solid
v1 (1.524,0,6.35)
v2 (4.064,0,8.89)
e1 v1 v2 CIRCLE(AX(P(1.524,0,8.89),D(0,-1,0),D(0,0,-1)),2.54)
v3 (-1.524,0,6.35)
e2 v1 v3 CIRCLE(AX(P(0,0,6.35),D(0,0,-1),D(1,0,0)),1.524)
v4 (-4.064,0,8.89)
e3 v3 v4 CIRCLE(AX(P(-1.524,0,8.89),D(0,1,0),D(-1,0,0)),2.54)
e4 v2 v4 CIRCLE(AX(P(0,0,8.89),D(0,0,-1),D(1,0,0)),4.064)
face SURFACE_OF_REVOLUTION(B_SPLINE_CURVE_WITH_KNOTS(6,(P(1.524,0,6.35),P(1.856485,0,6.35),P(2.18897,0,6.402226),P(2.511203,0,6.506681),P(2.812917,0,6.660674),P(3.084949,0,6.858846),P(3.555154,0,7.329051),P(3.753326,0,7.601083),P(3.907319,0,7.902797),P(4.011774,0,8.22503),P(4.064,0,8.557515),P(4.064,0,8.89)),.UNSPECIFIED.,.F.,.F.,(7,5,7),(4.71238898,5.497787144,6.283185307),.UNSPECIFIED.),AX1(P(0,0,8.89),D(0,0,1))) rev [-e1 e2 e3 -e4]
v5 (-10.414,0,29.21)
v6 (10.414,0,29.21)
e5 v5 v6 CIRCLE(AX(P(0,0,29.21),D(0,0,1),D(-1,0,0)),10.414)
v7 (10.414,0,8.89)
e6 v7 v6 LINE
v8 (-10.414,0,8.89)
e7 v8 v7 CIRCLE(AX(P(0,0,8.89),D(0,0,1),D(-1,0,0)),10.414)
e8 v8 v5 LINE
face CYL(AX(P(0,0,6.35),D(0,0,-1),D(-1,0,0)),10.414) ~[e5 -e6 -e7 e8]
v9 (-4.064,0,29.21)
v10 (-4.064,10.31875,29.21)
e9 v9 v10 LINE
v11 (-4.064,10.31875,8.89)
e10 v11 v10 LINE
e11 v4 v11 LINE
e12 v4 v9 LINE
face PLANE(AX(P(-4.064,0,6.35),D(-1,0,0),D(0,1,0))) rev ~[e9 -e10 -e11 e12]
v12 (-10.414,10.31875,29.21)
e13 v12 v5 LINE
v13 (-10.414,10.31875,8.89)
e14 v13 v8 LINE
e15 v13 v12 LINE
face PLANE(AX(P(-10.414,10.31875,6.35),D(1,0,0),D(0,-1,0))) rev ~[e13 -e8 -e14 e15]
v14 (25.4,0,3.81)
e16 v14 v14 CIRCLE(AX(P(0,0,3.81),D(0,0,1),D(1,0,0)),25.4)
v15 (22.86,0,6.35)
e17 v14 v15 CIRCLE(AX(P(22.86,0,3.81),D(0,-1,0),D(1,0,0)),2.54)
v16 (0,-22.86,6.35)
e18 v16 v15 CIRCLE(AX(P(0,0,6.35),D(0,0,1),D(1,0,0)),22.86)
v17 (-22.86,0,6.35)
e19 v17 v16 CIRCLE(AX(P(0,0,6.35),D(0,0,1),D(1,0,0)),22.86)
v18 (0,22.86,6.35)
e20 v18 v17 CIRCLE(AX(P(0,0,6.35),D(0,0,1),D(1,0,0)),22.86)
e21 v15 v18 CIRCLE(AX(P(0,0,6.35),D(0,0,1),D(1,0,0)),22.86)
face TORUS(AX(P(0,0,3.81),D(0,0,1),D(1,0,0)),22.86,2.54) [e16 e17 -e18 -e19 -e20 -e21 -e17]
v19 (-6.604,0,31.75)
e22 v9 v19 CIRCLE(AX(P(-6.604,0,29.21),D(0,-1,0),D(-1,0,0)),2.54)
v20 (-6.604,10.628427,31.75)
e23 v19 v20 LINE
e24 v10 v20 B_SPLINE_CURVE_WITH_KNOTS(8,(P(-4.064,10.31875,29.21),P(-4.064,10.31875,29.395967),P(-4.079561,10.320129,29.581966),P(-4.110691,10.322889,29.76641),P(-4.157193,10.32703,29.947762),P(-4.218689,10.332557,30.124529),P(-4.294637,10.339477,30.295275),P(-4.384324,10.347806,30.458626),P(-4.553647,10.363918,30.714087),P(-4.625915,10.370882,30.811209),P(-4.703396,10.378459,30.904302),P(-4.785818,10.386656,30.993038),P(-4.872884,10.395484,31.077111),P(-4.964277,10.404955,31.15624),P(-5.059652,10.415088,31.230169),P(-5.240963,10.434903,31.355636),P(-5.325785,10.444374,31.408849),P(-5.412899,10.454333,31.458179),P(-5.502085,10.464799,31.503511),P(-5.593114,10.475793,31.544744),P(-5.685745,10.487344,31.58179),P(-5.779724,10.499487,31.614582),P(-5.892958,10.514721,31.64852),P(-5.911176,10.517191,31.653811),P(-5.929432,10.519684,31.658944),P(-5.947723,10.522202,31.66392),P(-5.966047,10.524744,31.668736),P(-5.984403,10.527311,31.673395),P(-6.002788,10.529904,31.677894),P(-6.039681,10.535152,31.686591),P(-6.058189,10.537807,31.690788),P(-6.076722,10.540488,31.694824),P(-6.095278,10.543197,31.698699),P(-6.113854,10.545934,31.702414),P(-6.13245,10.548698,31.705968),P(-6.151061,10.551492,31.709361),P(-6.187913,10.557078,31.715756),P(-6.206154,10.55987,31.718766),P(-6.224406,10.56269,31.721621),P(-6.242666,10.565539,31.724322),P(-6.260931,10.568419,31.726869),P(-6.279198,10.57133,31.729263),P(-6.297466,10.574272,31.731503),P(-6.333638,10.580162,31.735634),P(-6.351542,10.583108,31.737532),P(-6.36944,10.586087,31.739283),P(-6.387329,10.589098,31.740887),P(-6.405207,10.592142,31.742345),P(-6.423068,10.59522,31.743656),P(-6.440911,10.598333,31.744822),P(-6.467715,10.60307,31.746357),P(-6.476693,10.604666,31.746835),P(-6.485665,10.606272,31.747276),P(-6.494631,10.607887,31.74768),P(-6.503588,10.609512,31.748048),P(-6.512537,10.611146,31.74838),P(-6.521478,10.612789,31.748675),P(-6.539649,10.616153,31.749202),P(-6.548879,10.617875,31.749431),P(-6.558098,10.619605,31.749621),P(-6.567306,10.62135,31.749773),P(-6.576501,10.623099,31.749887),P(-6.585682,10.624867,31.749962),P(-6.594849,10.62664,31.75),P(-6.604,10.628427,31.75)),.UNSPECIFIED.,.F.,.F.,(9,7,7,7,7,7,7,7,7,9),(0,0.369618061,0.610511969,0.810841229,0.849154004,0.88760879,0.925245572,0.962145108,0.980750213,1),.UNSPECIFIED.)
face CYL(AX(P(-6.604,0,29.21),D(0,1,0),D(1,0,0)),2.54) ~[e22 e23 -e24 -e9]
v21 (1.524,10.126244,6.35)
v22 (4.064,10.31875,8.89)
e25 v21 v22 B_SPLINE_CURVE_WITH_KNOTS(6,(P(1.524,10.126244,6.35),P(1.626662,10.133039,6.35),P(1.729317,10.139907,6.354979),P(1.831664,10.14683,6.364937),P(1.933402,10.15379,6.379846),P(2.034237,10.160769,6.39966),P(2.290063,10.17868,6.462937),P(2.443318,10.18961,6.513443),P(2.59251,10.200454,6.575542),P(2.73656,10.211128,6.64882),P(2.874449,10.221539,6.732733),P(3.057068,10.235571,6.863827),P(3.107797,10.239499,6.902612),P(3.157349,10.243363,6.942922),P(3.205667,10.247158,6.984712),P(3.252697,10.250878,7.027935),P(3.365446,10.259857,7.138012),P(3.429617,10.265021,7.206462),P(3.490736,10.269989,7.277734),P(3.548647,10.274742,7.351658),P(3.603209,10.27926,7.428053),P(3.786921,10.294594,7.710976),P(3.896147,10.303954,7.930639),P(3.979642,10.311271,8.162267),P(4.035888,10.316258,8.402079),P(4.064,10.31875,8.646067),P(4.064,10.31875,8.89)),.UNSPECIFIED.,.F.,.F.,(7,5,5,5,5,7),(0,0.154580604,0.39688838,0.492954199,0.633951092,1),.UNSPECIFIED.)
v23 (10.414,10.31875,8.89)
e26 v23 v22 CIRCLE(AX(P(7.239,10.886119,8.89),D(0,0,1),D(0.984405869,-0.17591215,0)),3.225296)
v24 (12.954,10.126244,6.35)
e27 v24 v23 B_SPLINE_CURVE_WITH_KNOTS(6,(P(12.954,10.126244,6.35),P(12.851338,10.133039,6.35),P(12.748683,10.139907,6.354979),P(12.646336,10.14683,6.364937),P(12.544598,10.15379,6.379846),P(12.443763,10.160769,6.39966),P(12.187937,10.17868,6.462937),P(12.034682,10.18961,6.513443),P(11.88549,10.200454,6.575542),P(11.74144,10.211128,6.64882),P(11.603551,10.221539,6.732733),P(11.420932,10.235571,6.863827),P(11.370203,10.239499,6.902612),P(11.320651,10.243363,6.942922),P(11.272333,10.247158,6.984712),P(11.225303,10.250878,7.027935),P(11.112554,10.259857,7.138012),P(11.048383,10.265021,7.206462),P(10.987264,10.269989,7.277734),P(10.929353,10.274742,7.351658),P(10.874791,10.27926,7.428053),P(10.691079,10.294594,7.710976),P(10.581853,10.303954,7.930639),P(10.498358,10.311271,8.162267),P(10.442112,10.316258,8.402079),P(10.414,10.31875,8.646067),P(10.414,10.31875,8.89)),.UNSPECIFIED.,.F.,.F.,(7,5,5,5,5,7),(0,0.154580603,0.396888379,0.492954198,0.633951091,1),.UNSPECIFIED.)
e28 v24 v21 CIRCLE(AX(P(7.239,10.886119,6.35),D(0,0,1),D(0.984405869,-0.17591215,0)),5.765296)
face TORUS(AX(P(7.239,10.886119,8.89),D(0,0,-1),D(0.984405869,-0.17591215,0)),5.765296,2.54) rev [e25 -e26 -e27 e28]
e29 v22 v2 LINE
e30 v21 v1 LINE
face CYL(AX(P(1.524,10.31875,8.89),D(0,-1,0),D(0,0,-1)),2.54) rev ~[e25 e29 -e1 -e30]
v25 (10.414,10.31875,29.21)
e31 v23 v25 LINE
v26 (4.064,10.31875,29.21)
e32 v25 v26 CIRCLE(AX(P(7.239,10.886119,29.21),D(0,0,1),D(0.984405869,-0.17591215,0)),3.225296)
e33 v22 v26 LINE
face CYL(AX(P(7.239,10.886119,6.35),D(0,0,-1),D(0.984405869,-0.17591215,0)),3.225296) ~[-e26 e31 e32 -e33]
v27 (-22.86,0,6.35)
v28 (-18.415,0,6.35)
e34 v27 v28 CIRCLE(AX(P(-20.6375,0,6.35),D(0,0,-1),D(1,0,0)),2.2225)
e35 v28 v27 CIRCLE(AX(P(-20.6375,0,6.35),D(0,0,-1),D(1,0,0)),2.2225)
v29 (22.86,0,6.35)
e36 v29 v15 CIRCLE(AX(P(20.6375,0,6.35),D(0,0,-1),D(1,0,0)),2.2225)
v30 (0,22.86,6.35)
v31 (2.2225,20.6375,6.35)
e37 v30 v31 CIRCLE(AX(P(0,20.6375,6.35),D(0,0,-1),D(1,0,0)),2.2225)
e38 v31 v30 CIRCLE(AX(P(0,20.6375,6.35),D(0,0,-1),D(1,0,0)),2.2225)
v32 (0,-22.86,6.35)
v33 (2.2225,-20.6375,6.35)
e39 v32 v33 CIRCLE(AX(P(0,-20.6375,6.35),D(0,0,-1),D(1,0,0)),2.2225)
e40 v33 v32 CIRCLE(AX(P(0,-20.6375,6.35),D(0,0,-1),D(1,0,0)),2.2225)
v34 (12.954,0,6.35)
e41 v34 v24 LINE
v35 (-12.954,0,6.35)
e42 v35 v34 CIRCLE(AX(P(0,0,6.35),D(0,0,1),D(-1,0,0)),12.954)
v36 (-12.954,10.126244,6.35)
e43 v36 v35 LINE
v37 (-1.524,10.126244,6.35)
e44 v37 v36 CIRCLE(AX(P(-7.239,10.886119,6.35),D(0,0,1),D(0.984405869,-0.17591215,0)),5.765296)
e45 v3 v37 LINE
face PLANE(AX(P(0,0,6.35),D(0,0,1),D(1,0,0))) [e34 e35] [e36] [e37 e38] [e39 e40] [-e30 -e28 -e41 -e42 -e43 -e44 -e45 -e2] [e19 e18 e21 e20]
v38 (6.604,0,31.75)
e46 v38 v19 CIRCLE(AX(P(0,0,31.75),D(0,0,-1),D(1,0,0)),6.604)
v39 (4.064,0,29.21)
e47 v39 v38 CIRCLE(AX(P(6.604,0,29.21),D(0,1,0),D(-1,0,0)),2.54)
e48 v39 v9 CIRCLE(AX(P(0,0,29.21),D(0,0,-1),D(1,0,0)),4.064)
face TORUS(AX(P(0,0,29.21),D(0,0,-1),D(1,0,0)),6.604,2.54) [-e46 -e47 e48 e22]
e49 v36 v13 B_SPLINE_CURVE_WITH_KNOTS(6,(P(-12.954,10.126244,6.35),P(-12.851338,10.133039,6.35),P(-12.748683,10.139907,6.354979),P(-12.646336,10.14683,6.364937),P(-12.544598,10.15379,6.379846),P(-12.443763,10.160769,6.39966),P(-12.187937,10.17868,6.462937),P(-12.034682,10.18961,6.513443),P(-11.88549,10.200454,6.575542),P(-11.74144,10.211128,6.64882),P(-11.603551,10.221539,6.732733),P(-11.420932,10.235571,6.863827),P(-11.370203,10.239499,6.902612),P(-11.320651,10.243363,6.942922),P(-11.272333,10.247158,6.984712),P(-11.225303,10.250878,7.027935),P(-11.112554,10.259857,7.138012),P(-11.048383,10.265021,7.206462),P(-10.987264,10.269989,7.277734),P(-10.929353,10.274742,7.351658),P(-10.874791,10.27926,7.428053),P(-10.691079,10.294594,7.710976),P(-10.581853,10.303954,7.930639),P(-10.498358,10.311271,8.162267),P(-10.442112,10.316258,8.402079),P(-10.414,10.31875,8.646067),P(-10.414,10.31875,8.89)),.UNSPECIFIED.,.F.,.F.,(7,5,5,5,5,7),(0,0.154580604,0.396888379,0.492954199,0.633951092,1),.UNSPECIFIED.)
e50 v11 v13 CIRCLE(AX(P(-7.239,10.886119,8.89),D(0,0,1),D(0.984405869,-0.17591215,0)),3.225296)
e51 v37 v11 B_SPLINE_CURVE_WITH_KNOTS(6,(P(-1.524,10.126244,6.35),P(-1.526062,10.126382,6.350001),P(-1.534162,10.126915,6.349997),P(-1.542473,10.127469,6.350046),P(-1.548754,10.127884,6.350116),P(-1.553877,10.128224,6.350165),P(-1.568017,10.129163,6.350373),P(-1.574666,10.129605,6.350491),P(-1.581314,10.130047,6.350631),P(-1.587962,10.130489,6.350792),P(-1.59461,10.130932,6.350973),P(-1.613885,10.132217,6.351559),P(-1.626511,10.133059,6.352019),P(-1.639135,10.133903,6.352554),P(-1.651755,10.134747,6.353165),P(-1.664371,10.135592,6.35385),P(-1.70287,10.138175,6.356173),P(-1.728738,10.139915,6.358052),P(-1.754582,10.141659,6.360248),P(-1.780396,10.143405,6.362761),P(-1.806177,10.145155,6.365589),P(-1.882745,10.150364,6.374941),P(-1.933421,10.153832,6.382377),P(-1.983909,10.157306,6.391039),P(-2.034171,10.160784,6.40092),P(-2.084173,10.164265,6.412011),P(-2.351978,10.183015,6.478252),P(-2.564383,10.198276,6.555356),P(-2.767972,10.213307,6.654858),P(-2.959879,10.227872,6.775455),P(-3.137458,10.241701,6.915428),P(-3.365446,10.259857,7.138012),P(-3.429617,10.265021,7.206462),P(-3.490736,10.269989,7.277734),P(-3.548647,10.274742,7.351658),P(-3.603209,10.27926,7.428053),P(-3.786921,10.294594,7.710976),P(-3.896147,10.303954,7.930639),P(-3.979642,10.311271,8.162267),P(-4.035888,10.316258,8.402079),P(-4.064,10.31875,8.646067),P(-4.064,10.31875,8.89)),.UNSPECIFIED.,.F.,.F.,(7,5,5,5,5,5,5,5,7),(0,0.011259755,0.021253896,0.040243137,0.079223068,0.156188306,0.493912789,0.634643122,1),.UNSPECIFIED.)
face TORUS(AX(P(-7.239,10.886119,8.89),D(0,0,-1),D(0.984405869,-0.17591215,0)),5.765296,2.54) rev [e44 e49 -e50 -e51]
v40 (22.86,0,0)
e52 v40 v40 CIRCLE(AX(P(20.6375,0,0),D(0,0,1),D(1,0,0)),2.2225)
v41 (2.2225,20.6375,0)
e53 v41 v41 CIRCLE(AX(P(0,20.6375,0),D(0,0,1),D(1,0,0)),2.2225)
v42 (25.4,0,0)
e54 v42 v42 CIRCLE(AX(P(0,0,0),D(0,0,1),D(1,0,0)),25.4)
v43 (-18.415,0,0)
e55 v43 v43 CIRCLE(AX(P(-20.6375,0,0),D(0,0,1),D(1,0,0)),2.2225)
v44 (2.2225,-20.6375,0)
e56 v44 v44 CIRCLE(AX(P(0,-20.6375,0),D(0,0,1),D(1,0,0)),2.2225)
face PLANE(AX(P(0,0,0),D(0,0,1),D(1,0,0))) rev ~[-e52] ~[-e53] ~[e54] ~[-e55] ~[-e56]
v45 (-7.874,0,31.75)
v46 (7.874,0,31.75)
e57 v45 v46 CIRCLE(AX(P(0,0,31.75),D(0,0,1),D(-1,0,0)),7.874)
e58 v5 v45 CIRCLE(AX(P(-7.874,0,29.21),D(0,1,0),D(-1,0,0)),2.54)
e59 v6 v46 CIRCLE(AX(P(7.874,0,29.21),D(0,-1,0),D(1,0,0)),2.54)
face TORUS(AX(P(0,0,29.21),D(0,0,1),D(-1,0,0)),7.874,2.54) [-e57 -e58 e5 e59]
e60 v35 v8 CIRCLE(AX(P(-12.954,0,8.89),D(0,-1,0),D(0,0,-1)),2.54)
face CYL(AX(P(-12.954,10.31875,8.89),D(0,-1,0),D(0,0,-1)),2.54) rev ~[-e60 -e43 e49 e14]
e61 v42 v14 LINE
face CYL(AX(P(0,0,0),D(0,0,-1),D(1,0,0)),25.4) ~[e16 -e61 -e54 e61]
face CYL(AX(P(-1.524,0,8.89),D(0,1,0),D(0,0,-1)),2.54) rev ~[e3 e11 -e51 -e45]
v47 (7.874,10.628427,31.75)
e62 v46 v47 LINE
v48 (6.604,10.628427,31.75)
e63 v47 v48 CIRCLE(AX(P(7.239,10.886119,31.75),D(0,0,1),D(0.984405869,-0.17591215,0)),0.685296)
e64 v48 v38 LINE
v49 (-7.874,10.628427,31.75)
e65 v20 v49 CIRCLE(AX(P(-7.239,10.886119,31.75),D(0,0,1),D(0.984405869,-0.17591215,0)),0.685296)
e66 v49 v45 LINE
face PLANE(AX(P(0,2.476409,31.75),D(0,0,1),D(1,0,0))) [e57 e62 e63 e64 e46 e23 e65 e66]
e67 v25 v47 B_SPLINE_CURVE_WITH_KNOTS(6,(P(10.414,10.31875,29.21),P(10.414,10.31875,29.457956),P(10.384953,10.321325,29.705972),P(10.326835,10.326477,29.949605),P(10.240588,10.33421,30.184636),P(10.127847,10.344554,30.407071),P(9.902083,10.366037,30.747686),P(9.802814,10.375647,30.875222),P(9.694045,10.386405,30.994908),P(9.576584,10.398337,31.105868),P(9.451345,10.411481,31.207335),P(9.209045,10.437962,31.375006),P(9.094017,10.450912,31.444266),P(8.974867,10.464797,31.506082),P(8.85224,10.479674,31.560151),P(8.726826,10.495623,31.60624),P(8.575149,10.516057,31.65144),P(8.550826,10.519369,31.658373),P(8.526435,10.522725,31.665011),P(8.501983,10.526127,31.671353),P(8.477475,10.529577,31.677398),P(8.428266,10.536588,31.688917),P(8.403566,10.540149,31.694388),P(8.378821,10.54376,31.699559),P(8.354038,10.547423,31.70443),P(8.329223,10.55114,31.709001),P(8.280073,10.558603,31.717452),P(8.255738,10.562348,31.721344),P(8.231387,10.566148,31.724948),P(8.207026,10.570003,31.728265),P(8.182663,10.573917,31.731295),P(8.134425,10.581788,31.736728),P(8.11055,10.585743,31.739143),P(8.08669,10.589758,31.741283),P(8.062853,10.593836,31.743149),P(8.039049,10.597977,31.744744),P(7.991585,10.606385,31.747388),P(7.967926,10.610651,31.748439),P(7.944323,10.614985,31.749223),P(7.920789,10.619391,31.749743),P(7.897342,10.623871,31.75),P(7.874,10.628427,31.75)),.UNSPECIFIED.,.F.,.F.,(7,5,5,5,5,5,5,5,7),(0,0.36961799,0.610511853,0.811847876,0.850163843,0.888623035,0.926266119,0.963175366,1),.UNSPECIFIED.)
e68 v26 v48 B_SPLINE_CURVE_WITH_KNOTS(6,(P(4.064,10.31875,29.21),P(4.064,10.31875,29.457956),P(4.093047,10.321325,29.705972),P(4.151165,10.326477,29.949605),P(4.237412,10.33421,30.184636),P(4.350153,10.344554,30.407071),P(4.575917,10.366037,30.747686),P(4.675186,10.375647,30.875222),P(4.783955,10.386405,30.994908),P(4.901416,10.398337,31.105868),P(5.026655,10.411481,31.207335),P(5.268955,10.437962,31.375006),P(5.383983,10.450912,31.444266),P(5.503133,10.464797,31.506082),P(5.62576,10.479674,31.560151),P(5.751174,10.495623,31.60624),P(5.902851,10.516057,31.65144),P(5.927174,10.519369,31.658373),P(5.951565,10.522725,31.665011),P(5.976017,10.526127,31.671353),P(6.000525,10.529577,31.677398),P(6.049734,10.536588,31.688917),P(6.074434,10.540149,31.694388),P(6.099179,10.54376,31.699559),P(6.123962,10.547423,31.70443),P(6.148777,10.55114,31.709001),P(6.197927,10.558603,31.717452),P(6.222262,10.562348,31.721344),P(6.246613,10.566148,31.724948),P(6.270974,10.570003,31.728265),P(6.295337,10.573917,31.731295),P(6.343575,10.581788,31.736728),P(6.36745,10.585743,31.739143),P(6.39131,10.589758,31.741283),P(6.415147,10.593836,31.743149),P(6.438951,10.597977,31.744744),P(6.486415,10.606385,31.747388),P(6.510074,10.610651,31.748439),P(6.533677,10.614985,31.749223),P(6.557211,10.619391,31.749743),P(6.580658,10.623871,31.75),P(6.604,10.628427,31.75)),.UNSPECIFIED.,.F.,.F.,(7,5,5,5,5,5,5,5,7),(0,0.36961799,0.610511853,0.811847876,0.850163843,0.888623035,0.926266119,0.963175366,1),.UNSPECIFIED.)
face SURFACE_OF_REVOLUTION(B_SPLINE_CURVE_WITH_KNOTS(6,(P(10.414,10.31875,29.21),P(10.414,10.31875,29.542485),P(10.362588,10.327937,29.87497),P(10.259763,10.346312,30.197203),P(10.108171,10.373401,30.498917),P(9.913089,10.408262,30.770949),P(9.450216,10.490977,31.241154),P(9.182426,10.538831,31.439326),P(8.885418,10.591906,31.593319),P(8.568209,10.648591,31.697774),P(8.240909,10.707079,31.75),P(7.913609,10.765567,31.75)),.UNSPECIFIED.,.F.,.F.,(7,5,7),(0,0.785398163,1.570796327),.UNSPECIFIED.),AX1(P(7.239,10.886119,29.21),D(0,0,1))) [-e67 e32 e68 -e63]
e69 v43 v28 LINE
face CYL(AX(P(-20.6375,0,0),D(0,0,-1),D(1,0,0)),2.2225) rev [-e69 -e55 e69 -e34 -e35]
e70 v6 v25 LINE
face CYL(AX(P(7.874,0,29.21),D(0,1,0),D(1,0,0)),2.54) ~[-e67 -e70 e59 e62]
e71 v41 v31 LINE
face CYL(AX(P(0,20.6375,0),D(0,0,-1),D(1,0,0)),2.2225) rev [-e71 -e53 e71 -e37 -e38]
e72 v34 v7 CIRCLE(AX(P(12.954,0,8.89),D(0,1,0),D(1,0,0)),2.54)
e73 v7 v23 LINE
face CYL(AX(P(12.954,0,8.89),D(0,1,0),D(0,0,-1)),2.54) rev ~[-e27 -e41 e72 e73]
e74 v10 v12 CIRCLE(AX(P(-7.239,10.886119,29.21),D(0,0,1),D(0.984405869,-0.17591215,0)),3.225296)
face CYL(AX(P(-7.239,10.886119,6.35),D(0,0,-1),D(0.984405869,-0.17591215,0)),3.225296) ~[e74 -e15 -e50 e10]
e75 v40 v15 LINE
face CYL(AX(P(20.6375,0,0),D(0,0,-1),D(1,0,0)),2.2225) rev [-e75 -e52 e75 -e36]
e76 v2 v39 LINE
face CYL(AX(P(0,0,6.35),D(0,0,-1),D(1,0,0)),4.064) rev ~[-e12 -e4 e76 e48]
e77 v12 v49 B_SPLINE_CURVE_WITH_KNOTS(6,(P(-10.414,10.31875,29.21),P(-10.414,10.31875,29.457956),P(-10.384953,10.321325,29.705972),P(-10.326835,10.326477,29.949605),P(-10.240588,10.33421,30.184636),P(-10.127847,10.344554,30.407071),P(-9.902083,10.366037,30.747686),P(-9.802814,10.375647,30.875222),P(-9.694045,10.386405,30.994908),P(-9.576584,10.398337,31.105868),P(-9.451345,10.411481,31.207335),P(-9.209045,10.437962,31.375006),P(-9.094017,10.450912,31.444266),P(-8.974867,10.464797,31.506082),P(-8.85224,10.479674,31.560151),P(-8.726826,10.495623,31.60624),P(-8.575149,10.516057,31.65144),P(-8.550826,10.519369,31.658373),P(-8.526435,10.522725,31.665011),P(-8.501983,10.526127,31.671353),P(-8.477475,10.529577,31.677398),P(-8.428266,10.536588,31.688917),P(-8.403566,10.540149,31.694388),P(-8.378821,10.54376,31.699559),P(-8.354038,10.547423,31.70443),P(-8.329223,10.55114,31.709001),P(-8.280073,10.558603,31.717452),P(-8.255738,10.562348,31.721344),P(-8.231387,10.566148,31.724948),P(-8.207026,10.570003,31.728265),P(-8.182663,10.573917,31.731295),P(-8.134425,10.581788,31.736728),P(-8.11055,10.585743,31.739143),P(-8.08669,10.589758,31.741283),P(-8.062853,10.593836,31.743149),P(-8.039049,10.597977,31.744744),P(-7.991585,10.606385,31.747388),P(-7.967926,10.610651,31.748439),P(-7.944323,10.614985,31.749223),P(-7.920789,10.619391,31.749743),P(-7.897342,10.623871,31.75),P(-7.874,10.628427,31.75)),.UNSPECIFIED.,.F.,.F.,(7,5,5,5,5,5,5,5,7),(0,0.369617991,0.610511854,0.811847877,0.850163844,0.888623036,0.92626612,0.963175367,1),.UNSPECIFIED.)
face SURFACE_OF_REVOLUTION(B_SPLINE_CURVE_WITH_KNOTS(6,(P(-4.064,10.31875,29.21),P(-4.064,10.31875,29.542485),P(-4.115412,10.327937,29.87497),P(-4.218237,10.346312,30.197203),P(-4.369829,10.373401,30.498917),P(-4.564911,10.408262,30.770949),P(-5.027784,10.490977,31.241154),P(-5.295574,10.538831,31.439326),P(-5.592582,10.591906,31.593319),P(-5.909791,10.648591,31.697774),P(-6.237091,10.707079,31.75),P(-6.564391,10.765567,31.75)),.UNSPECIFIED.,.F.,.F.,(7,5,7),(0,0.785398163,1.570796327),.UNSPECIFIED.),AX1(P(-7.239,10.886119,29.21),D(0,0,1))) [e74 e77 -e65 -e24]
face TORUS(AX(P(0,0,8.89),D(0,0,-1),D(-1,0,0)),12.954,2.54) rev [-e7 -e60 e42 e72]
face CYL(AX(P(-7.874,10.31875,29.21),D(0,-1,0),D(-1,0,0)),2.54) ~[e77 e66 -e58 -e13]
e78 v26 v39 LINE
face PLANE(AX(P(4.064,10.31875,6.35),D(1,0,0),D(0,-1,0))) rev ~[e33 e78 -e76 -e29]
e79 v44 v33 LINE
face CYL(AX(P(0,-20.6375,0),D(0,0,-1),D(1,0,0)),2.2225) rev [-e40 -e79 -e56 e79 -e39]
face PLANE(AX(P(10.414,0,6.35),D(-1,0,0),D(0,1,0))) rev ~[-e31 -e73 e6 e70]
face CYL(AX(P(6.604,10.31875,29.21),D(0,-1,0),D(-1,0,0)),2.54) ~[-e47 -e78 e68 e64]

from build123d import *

# Parameters (mm, degrees)
F0_R     = 25.4
F0_R_2   = 2.2225
F1_DEPTH = 6.35
F3_DEPTH = 25.4
F5_R     = 2.54
F6_DEPTH = 25.4


# Not quite as in the source:
# - a feature of the source that left no trace in its solid (it failed there, or was rolled back) is left out


with BuildPart() as f1:
    # F0 (on Top) → F1 (new body)
    with BuildSketch(Plane.XY):
        Circle(F0_R)
        with Locations((0, -20.6375)):
            Circle(F0_R_2, mode=Mode.SUBTRACT)
        with Locations((-20.6375, 0)):
            Circle(F0_R_2, mode=Mode.SUBTRACT)
        with Locations((20.6375, 0)):
            Circle(F0_R_2, mode=Mode.SUBTRACT)
        with BuildLine():
            Line((-4.064, 10.31875), (-4.064, 0))
            ThreePointArc((-4.064, 0), (0, -4.064), (4.064, 0))
            Line((4.064, 0), (4.064, 10.31875))
            ThreePointArc((4.064, 10.31875), (7.239, 14.1114143812), (10.414, 10.31875))
            Line((10.414, 10.31875), (10.414, 0))
            ThreePointArc((10.414, 0), (0, -10.414), (-10.414, 0))
            Line((-10.414, 0), (-10.414, 10.31875))
            ThreePointArc((-10.414, 10.31875), (-7.239, 14.1114143812), (-4.064, 10.31875))
        make_face(mode=Mode.SUBTRACT)
        with Locations((0, 20.6375)):
            Circle(F0_R_2, mode=Mode.SUBTRACT)
        with BuildLine():
            ThreePointArc((4.064, 0), (0, -4.064), (-4.064, 0))
            Line((-4.064, 0), (-4.064, 10.31875))
            ThreePointArc((-4.064, 10.31875), (-7.239, 14.1114143812), (-10.414, 10.31875))
            Line((-10.414, 10.31875), (-10.414, 0))
            ThreePointArc((-10.414, 0), (0, -10.414), (10.414, 0))
            Line((10.414, 0), (10.414, 10.31875))
            ThreePointArc((10.414, 10.31875), (7.239, 14.1114143812), (4.064, 10.31875))
            Line((4.064, 10.31875), (4.064, 0))
        make_face()
        with Locations((0, -20.6375)):
            Circle(F0_R_2)
        with Locations((-20.6375, 0)):
            Circle(F0_R_2)
        with Locations((0, 20.6375)):
            Circle(F0_R_2)
        with Locations((20.6375, 0)):
            Circle(F0_R_2)
    extrude(amount=F1_DEPTH)

    # F2 (on face) → F3 (join)
    with BuildSketch(Plane.XY.offset(6.35)):
        with BuildLine():
            Line((-10.414, 10.31875), (-10.414, 0))
            ThreePointArc((-10.414, 0), (0, -10.414), (10.414, 0))
            Line((10.414, 0), (10.414, 10.31875))
            ThreePointArc((10.414, 10.31875), (7.239, 14.1114143812), (4.064, 10.31875))
            Line((4.064, 10.31875), (4.064, 0))
            ThreePointArc((4.064, 0), (0, -4.064), (-4.064, 0))
            Line((-4.064, 0), (-4.064, 10.31875))
            ThreePointArc((-4.064, 10.31875), (-7.239, 14.1114143812), (-10.414, 10.31875))
        make_face()
    extrude(amount=F3_DEPTH)

    # F5
    f5_edges = [f1.edges().sort_by_distance(p)[0] for p in [
        (-4.064, 5.159375, 31.75),
        (-7.239, 14.111414, 31.75),
        (-10.414, 5.159375, 31.75),
        (0, -10.414, 31.75),
        (10.414, 5.159375, 31.75),
        (7.239, 14.111414, 31.75),
        (4.064, 5.159375, 31.75),
        (0, -4.064, 31.75),
        (-25.4, 0, 6.35),
        (-4.064, 5.159375, 6.35),
        (-7.239, 14.111414, 6.35),
        (-10.414, 5.159375, 6.35),
        (0, -10.414, 6.35),
        (10.414, 5.159375, 6.35),
        (7.239, 14.111414, 6.35),
        (4.064, 5.159375, 6.35),
        (0, -4.064, 6.35),
    ]]
    fillet(f5_edges, radius=F5_R)

    # F0 (on Top) → F6 (cut)
    with BuildSketch(Plane.XY):
        with Locations((20.6375, 0)):
            Circle(F0_R_2)
        with Locations((0, 20.6375)):
            Circle(F0_R_2)
        with Locations((-20.6375, 0)):
            Circle(F0_R_2)
        with Locations((0, -20.6375)):
            Circle(F0_R_2)
    extrude(amount=F6_DEPTH, mode=Mode.SUBTRACT)


solid = f1.part
